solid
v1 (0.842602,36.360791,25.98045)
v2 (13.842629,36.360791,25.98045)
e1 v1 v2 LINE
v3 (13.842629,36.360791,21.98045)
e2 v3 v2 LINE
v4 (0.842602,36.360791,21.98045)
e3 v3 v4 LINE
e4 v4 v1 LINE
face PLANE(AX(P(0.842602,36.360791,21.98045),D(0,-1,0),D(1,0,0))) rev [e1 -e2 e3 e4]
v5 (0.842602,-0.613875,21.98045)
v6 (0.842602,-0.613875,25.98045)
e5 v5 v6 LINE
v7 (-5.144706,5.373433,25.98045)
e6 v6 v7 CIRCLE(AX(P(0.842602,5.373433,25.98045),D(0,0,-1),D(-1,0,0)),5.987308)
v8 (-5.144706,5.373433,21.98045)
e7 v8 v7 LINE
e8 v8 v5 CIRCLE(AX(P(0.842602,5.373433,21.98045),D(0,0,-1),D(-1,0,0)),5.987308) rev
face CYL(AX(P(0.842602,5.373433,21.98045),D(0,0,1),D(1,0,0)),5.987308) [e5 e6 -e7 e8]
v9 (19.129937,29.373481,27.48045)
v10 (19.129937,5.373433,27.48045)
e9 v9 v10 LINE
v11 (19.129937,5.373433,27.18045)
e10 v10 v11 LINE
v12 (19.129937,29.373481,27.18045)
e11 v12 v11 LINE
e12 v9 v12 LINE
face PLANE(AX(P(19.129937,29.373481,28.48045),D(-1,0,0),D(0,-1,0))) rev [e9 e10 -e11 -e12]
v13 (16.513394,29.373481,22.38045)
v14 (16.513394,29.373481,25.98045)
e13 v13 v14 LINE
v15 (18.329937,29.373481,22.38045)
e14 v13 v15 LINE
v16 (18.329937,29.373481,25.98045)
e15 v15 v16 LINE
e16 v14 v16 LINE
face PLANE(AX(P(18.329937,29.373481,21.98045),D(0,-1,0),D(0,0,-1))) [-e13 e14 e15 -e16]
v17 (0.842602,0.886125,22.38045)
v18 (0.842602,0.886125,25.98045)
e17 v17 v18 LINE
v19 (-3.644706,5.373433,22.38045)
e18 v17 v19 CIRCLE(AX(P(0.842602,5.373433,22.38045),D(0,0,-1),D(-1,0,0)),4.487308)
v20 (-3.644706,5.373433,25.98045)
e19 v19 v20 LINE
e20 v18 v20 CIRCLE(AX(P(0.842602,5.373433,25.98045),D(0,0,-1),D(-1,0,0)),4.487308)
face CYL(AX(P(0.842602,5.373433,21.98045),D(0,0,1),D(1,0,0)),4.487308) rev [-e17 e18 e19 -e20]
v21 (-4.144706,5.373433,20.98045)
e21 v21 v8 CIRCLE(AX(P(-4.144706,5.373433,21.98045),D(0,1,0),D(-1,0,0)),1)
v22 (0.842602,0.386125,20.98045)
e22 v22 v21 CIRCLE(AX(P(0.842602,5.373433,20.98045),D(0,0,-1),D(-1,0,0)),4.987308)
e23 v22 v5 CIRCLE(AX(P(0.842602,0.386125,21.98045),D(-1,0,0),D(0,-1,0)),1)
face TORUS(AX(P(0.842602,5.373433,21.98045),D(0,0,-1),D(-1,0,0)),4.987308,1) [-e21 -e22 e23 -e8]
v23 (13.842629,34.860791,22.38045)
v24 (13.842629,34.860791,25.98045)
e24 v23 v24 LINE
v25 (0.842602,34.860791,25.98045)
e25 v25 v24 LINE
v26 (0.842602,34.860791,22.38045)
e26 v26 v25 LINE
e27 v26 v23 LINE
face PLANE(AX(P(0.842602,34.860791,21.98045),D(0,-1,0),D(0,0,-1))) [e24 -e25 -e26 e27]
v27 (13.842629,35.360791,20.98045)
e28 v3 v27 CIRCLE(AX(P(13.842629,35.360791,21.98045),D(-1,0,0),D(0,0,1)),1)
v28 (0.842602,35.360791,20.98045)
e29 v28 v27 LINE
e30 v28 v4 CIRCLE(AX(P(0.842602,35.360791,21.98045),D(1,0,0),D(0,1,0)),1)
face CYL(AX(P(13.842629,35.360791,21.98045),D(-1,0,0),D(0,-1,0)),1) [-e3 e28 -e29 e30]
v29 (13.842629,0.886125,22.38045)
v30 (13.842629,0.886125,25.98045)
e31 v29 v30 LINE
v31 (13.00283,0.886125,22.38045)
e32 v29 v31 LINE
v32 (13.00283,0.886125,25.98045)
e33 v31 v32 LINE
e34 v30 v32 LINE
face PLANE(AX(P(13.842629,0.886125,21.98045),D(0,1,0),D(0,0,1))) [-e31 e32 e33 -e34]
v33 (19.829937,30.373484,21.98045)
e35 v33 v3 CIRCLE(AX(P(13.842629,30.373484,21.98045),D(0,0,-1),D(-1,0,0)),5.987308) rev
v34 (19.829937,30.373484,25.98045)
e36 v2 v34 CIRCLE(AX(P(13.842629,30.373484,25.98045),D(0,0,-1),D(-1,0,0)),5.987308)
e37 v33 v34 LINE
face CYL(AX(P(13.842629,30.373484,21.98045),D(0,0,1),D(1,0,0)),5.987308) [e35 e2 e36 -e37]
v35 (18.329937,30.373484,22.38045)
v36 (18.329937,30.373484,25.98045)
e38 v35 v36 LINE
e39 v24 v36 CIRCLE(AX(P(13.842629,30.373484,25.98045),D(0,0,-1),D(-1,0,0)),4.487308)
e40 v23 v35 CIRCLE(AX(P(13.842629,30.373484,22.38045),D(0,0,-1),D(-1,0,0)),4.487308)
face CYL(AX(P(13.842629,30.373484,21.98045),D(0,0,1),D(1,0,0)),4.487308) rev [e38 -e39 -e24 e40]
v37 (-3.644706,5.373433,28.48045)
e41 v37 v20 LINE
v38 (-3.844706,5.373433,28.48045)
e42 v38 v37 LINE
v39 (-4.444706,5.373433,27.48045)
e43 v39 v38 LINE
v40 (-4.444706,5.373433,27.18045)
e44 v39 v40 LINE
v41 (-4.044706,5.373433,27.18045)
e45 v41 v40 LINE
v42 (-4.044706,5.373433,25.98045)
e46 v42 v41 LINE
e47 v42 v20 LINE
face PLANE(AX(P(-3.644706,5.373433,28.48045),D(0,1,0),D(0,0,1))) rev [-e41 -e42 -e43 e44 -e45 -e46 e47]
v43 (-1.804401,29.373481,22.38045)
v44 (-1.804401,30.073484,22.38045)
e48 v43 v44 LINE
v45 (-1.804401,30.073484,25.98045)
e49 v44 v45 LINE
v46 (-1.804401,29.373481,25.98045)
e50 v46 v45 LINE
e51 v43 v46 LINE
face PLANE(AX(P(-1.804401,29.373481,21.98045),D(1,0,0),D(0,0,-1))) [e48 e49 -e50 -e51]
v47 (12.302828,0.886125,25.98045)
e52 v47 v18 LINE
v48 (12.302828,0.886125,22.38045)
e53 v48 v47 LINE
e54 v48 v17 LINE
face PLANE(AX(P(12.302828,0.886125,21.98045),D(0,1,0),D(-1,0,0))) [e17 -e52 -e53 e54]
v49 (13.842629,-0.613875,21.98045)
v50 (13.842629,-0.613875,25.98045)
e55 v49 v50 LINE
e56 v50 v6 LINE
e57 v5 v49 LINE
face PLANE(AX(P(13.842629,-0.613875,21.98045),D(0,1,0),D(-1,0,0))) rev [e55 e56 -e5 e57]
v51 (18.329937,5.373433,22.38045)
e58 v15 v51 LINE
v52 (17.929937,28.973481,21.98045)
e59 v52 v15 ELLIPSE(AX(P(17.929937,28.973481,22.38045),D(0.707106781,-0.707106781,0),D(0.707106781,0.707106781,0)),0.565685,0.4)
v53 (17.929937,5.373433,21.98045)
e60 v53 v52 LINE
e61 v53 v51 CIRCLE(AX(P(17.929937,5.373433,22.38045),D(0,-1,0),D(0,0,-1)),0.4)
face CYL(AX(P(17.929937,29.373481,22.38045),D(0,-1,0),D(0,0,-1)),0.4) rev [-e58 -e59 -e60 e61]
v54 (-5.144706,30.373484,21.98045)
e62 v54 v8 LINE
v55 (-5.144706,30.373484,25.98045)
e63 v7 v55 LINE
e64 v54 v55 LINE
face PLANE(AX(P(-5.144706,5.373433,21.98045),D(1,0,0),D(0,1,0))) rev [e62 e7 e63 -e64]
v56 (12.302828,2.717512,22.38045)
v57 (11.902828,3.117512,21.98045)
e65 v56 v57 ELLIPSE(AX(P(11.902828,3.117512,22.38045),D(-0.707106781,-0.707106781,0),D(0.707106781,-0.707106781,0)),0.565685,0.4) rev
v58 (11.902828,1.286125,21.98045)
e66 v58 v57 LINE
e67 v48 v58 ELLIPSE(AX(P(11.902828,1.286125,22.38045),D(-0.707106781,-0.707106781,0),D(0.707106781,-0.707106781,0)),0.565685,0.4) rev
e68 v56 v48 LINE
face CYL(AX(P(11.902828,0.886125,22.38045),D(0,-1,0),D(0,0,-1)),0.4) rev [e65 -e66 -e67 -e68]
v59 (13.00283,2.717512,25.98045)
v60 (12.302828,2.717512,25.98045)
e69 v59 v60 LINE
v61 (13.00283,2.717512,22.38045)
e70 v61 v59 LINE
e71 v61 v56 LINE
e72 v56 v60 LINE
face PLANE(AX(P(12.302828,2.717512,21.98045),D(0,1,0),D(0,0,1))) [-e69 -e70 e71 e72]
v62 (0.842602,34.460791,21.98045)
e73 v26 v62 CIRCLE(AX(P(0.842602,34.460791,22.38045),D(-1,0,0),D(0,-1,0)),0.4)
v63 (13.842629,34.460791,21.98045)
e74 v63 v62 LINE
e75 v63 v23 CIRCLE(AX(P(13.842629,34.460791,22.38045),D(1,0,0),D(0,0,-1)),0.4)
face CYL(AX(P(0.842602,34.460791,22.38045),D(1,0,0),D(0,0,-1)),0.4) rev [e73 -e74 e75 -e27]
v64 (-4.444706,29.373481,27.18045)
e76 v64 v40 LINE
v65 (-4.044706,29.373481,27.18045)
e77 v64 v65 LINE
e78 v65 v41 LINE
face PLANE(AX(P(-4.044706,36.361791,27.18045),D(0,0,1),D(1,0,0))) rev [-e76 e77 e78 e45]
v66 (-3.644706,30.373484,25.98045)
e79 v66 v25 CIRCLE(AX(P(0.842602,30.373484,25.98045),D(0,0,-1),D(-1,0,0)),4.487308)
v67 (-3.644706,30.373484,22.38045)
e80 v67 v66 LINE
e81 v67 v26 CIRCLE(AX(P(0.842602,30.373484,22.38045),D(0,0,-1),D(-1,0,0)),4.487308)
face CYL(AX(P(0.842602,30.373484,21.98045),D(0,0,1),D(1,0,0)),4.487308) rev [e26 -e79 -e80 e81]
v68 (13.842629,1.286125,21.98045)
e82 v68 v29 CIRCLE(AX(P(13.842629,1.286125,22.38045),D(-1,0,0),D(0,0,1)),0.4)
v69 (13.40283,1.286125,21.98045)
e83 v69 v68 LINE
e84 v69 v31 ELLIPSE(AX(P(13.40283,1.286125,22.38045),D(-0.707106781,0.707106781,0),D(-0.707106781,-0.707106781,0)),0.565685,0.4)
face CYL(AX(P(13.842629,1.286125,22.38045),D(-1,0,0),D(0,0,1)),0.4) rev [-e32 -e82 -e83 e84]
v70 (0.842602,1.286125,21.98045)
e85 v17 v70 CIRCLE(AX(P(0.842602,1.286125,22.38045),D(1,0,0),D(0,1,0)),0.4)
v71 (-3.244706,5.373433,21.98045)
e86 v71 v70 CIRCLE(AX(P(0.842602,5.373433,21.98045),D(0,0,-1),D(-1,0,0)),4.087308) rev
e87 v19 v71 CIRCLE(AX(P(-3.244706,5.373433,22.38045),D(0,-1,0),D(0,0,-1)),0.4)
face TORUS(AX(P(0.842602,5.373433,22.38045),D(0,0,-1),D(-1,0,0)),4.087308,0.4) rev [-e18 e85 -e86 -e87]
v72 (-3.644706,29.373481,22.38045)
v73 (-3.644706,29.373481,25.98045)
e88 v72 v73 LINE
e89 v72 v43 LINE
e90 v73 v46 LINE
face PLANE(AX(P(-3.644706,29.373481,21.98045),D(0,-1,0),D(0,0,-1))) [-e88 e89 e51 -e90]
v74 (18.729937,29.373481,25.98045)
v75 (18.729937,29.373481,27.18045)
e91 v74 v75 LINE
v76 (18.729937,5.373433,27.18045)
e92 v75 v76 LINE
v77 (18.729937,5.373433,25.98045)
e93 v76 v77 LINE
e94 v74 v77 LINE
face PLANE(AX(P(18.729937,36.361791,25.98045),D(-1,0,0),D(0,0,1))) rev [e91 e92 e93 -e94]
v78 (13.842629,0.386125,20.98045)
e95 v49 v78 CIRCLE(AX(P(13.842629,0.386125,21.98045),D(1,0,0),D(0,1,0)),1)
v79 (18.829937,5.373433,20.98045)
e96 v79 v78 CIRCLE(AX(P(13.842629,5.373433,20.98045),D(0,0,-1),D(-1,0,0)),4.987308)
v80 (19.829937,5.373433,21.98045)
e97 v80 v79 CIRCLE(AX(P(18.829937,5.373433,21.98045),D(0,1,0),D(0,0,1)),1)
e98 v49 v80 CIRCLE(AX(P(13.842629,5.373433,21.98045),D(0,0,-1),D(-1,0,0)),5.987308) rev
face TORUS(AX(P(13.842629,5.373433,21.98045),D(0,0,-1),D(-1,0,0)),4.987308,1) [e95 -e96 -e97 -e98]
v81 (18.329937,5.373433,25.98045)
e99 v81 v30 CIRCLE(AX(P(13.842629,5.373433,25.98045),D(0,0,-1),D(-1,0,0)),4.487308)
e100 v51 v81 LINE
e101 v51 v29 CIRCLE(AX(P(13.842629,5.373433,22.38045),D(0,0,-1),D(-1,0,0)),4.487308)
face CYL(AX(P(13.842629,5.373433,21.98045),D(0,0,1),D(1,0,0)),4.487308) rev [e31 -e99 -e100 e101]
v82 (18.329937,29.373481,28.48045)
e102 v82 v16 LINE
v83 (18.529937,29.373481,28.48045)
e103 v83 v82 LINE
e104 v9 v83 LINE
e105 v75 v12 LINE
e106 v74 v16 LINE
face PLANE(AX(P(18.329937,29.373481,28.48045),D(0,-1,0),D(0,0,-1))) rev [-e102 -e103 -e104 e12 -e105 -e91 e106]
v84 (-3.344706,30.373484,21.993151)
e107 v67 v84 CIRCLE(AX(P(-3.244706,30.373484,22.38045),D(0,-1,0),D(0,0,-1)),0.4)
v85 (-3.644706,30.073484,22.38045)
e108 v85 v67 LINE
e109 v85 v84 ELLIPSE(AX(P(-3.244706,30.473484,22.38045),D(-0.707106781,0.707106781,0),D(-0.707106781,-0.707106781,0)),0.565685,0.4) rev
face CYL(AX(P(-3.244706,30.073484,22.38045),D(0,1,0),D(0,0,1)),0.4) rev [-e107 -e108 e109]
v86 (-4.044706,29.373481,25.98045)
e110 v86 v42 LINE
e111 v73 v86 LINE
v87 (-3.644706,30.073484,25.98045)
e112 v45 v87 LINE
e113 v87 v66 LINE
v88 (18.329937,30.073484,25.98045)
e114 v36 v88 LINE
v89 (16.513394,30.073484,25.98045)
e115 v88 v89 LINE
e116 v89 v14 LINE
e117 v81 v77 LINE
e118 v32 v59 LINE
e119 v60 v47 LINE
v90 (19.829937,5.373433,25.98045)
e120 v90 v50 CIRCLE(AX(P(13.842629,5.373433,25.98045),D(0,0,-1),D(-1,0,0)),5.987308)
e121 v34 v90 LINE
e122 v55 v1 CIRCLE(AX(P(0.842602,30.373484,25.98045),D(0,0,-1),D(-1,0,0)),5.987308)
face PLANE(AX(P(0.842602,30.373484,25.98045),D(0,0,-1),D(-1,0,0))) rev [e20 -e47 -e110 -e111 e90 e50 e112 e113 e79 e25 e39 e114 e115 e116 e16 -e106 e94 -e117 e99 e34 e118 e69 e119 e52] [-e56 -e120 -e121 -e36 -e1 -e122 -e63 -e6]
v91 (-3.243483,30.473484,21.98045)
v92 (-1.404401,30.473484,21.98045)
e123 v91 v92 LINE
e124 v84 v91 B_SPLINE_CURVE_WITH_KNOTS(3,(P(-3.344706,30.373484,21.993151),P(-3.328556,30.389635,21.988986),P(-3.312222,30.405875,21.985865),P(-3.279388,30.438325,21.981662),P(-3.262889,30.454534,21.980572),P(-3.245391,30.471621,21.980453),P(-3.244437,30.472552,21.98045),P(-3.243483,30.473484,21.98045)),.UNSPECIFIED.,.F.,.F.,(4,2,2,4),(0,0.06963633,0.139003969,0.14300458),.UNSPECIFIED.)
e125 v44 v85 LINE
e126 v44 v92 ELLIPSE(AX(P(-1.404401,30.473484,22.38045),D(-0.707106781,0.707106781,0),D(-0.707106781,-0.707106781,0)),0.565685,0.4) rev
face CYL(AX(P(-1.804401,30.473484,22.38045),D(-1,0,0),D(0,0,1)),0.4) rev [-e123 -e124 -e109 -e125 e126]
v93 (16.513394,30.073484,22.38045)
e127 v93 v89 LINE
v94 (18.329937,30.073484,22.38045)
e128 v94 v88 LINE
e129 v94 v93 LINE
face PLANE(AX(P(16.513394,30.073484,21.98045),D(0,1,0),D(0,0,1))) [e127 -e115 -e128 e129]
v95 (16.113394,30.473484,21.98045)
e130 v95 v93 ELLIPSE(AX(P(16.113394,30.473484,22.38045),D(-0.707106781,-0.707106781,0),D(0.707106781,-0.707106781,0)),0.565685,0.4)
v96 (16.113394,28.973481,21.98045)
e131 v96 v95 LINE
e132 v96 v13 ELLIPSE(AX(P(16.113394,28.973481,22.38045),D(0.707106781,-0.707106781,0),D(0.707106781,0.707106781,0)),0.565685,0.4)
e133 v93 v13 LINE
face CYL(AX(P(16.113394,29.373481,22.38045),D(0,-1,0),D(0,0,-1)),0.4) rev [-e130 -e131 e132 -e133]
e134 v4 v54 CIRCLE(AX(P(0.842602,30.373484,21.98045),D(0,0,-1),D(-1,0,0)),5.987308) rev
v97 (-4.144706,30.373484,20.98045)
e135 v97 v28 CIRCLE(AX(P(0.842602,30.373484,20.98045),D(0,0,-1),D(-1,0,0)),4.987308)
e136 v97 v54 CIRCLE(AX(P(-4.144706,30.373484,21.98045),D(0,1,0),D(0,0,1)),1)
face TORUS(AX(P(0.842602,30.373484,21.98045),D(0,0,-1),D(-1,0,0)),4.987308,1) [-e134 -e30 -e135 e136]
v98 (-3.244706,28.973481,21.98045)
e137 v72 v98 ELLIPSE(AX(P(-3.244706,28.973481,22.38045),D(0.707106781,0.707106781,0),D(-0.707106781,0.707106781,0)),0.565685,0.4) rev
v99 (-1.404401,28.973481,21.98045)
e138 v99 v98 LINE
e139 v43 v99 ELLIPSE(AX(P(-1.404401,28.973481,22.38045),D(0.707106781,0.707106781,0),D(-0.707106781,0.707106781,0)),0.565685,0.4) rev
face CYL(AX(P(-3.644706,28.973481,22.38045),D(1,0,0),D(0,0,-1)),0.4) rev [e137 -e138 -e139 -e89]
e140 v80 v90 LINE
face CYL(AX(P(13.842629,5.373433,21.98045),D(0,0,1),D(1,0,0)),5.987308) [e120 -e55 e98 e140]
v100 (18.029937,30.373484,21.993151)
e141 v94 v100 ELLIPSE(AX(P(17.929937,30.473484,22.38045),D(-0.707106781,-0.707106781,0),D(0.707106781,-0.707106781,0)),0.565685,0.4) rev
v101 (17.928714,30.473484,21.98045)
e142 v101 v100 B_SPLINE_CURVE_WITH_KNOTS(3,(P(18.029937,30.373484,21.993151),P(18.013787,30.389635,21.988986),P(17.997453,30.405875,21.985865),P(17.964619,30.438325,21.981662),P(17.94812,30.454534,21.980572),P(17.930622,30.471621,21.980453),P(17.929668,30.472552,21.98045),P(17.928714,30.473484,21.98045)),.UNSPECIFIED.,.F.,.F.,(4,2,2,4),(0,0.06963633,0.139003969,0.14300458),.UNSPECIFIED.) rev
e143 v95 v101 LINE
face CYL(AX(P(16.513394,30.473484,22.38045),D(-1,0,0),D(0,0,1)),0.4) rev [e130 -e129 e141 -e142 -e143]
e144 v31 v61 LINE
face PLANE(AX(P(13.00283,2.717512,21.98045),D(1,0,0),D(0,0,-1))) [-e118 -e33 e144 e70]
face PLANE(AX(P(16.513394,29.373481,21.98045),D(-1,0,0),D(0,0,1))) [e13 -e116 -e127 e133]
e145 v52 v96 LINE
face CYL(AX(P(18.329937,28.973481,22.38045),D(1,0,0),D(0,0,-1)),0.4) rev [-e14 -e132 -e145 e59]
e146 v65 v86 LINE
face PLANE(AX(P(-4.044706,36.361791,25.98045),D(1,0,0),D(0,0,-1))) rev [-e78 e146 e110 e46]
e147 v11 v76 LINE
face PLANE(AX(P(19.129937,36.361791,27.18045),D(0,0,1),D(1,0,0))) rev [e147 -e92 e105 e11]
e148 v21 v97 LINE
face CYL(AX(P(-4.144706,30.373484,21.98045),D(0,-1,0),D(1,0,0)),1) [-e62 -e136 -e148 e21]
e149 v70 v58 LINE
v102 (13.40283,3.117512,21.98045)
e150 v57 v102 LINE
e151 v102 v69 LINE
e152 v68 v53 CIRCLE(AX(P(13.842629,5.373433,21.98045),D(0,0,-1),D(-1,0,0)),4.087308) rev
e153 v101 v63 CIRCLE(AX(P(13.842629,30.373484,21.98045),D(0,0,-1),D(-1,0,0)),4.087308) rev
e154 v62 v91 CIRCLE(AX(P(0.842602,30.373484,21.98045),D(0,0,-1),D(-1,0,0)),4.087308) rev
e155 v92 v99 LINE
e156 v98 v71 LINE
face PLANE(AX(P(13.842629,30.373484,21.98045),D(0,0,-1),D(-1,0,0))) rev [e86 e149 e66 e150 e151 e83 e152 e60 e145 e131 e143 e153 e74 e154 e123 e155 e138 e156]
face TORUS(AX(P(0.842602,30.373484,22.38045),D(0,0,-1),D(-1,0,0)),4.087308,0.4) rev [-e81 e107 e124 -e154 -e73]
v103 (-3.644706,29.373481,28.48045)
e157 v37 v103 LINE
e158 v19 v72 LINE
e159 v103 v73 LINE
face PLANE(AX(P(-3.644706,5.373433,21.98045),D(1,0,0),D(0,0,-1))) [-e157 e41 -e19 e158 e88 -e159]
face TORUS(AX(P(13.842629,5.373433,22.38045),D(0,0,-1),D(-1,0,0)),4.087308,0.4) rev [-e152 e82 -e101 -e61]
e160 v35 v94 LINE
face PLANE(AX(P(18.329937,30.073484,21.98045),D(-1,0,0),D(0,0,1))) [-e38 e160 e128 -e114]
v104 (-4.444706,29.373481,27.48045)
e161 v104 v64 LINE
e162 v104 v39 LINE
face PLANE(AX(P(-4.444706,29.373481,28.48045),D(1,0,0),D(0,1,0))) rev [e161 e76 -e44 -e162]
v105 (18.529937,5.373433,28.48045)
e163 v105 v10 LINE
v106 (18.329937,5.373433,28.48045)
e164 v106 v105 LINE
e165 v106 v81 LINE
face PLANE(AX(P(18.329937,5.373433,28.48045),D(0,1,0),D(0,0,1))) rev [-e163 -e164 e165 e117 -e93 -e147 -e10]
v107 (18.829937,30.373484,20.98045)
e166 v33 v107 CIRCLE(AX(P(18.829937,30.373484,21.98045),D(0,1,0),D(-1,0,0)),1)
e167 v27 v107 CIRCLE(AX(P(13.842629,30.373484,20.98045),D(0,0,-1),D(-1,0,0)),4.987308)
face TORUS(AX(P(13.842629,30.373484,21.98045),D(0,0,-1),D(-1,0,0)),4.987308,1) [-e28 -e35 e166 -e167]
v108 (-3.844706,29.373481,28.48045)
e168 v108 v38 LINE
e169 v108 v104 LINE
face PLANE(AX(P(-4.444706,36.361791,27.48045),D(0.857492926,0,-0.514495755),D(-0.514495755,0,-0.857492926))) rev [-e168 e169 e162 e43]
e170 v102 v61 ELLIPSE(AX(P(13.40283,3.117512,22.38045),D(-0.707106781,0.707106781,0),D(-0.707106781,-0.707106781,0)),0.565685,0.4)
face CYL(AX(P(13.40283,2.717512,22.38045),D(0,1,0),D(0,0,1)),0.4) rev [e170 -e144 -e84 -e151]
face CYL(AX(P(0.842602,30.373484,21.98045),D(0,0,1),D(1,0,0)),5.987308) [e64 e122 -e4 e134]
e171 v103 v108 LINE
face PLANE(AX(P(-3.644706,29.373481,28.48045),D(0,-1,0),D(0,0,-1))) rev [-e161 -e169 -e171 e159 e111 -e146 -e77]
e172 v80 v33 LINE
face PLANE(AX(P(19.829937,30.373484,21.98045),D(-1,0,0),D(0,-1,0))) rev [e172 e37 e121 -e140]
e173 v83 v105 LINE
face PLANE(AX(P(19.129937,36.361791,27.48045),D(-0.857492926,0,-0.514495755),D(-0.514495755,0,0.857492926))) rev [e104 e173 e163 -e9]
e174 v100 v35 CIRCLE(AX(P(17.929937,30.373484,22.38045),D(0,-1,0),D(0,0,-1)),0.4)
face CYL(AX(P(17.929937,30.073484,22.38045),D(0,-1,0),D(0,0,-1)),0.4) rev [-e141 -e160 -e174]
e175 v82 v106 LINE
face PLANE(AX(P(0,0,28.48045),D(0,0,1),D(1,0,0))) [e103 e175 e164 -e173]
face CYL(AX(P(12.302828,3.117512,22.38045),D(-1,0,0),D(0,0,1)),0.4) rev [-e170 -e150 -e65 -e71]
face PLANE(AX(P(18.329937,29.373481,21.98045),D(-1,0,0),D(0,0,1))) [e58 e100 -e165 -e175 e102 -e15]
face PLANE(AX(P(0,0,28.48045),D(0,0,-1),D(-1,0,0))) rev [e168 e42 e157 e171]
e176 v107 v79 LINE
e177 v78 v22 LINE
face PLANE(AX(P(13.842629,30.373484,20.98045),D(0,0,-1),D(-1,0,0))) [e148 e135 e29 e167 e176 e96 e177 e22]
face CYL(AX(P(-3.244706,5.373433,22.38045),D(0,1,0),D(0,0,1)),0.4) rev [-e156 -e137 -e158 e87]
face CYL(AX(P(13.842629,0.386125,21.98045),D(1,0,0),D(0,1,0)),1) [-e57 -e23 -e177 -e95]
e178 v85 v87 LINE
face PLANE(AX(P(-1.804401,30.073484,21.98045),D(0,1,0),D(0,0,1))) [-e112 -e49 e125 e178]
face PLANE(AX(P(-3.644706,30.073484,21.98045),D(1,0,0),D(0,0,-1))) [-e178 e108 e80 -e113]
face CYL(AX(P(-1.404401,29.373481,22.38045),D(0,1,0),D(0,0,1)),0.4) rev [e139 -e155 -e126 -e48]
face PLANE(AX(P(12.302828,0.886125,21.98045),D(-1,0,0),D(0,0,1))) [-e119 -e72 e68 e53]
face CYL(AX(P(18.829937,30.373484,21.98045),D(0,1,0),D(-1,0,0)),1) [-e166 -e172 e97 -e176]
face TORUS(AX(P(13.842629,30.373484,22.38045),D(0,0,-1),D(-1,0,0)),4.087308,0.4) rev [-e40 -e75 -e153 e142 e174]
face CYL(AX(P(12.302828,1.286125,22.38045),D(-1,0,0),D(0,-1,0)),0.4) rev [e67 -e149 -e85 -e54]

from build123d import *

# Parameters (mm, degrees)
BOSS_EXTRUDE1_DEPTH = 4
BOSS_EXTRUDE2_DEPTH = 1
SKETCH3_W           = 0.8
SKETCH3_H           = 24.00004826
BOSS_EXTRUDE3_DEPTH = 2.5
CUT_EXTRUDE1_REACH  = 48.525
SKETCH4_W           = 0.4
SKETCH4_H           = 1.2
FILLET1_R           = 1
FILLET2_R           = 0.4


with BuildPart() as part:
    # Sketch1 → Boss-Extrude1 (new body)
    with BuildSketch(Plane(origin=(0, 0, 25.980449513), x_dir=(-1, 0, 0), z_dir=(0, 0, -1))):
        with BuildLine():
            Line((-0.842601542, 36.360791374), (-13.842629482, 36.360791374))
            ThreePointArc((-13.842629482, 36.360791374), (-18.076295283, 34.607149581), (-19.829937076, 30.37348378))
            Line((-19.829937076, 30.37348378), (-19.829937076, 5.373432979))
            ThreePointArc((-19.829937076, 5.373432979), (-18.076295283, 1.139767178), (-13.842629482, -0.613874615))
            Line((-13.842629482, -0.613874615), (-0.842601542, -0.613874615))
            ThreePointArc((-0.842601542, -0.613874615), (3.391064259, 1.139767178), (5.144706053, 5.373432979))
            Line((5.144706053, 5.373432979), (5.144706053, 30.37348378))
            ThreePointArc((5.144706053, 30.37348378), (3.391064259, 34.607149581), (-0.842601542, 36.360791374))
        make_face()
        with BuildLine():
            Line((-18.329937076, 29.373481239), (-16.513394023, 29.373481239))
            Line((-16.513394023, 29.373481239), (-16.513394023, 30.07348378))
            Line((-16.513394023, 30.07348378), (-18.329937076, 30.07348378))
            Line((-18.329937076, 30.07348378), (-18.329937076, 30.37348378))
            ThreePointArc((-18.329937076, 30.37348378), (-17.015635111, 33.546489409), (-13.842629482, 34.860791374))
            Line((-13.842629482, 34.860791374), (-0.842601542, 34.860791374))
            ThreePointArc((-0.842601542, 34.860791374), (2.330404088, 33.546489409), (3.644706053, 30.37348378))
            Line((3.644706053, 30.37348378), (3.644706053, 30.07348378))
            Line((3.644706053, 30.07348378), (1.804401252, 30.07348378))
            Line((1.804401252, 30.07348378), (1.804401252, 29.373481239))
            Line((1.804401252, 29.373481239), (3.644706053, 29.373481239))
            Line((3.644706053, 29.373481239), (3.644706053, 5.373432979))
            ThreePointArc((3.644706053, 5.373432979), (2.330404088, 2.20042735), (-0.842601542, 0.886125385))
            Line((-0.842601542, 0.886125385), (-12.302827602, 0.886125385))
            Line((-12.302827602, 0.886125385), (-12.302827602, 2.717512228))
            Line((-12.302827602, 2.717512228), (-13.002830142, 2.717512228))
            Line((-13.002830142, 2.717512228), (-13.002830142, 0.886125385))
            Line((-13.002830142, 0.886125385), (-13.842629482, 0.886125385))
            ThreePointArc((-13.842629482, 0.886125385), (-17.015635111, 2.20042735), (-18.329937076, 5.373432979))
            Line((-18.329937076, 5.373432979), (-18.329937076, 29.373481239))
        make_face(mode=Mode.SUBTRACT)
    extrude(amount=BOSS_EXTRUDE1_DEPTH)

    # Sketch2 → Boss-Extrude2 (add)
    with BuildSketch(Plane(origin=(0, 0, 21.980449513), x_dir=(-1, 0, 0), z_dir=(0, 0, -1))):
        with BuildLine():
            Line((-19.829937076, 30.37348378), (-19.829937076, 5.373432979))
            ThreePointArc((-19.829937076, 5.373432979), (-18.076295283, 1.139767178), (-13.842629482, -0.613874615))
            Line((-13.842629482, -0.613874615), (-0.842601542, -0.613874615))
            ThreePointArc((-0.842601542, -0.613874615), (3.391064259, 1.139767178), (5.144706053, 5.373432979))
            Line((5.144706053, 5.373432979), (5.144706053, 30.37348378))
            ThreePointArc((5.144706053, 30.37348378), (3.391064259, 34.607149581), (-0.842601542, 36.360791374))
            Line((-0.842601542, 36.360791374), (-13.842629482, 36.360791374))
            ThreePointArc((-13.842629482, 36.360791374), (-18.076295283, 34.607149581), (-19.829937076, 30.37348378))
        make_face()
    extrude(amount=BOSS_EXTRUDE2_DEPTH)

    # Sketch3 → Boss-Extrude3 (add)
    with BuildSketch(Plane.XY.offset(25.980449513)):
        with Locations((-4.044706053, 17.373457109)):
            Rectangle(SKETCH3_W, SKETCH3_H)
        with Locations((18.729937076, 17.373457109)):
            Rectangle(SKETCH3_W, SKETCH3_H)
    extrude(amount=BOSS_EXTRUDE3_DEPTH)

    # Sketch4 → Cut-Extrude1 (cut, up to next)
    with BuildSketch(Plane.XZ.offset(-5.373432979), mode=Mode.PRIVATE) as cut_extrude1_sk1:
        with Locations((-4.244706053, 26.580449513)):
            Rectangle(SKETCH4_W, SKETCH4_H)
    cut_extrude1_tool1 = extrude(cut_extrude1_sk1.sketch, amount=-CUT_EXTRUDE1_REACH, mode=Mode.PRIVATE) & part.part
    # Sketch4 → Cut-Extrude1 (cut, up to next)
    with BuildSketch(Plane.XZ.offset(-5.373432979), mode=Mode.PRIVATE) as cut_extrude1_sk2:
        Polygon((-4.444706053, 28.480449513), (-4.444706053, 27.480449513), (-3.844706053, 28.480449513), align=None)
    cut_extrude1_tool2 = extrude(cut_extrude1_sk2.sketch, amount=-CUT_EXTRUDE1_REACH, mode=Mode.PRIVATE) & part.part
    # Sketch4 → Cut-Extrude1 (cut, up to next)
    with BuildSketch(Plane.XZ.offset(-5.373432979), mode=Mode.PRIVATE) as cut_extrude1_sk3:
        with Locations((18.929937076, 26.580449513)):
            Rectangle(SKETCH4_W, SKETCH4_H)
    cut_extrude1_tool3 = extrude(cut_extrude1_sk3.sketch, amount=-CUT_EXTRUDE1_REACH, mode=Mode.PRIVATE) & part.part
    # Sketch4 → Cut-Extrude1 (cut, up to next)
    with BuildSketch(Plane.XZ.offset(-5.373432979), mode=Mode.PRIVATE) as cut_extrude1_sk4:
        Polygon((18.529937076, 28.480449513), (19.129937076, 28.480449513), (19.129937076, 27.480449513), align=None)
    cut_extrude1_tool4 = extrude(cut_extrude1_sk4.sketch, amount=-CUT_EXTRUDE1_REACH, mode=Mode.PRIVATE) & part.part
    add(cut_extrude1_tool1.solids().sort_by_distance((-4.244706, 5.373433, 26.58045))[0], mode=Mode.SUBTRACT)
    add(cut_extrude1_tool2.solids().sort_by_distance((-4.244706, 5.373433, 28.147116))[0], mode=Mode.SUBTRACT)
    add(cut_extrude1_tool3.solids().sort_by_distance((18.929937, 5.373433, 26.58045))[0], mode=Mode.SUBTRACT)
    add(cut_extrude1_tool4.solids().sort_by_distance((18.929937, 5.373433, 28.147116))[0], mode=Mode.SUBTRACT)

    # Fillet1
    fillet1_edges = [part.edges().sort_by_distance(p)[0] for p in [
        (18.076295283, 34.607149581, 20.980449513),
        (19.829937076, 17.873458379, 20.980449513),
        (18.076295283, 1.139767178, 20.980449513),
        (7.342615512, -0.613874615, 20.980449513),
        (-3.391064259, 1.139767178, 20.980449513),
        (-5.144706053, 17.873458379, 20.980449513),
        (-3.391064259, 34.607149581, 20.980449513),
        (7.342615512, 36.360791374, 20.980449513),
    ]]
    fillet(fillet1_edges, radius=FILLET1_R)

    # Fillet2
    # the kernel refuses this fillet: 0.4 mm, written as the material it adds along each edge
    with BuildSketch(Plane(origin=(13.842629482, 34.860791374, 21.980449513), x_dir=(0, 0, 1), z_dir=(-1, 0, 0))) as fillet2_piece_1:
        with BuildLine():
            CenterArc((FILLET2_R, -FILLET2_R), FILLET2_R, 90, 90)
            Line((0, -FILLET2_R), (0, 0))
            Line((0, 0), (FILLET2_R, 0))
        make_face()
    extrude(amount=13.00002794)
    with BuildSketch(Plane(origin=(13.842629482, 30.37348378, 21.980449513), x_dir=(1, 0, 0), z_dir=(0, -1, 0))) as fillet2_piece_2:
        with BuildLine():
            CenterArc((4.487307595 - FILLET2_R, FILLET2_R), FILLET2_R, 270, 90)
            Line((4.487307595 - FILLET2_R, 0), (4.487307595, 0))
            Line((4.487307595, 0), (4.487307595, FILLET2_R))
        make_face()
    revolve(axis=Axis((13.842629482, 30.37348378, 21.980449513), (0, 0, 1)), revolution_arc=90)
    with BuildSketch(Plane(origin=(16.513394023, 30.07348378, 21.980449513), x_dir=(0, 0, 1), z_dir=(1, 0, 0)), Plane(origin=(19.329937076, 29.373481239, 21.980449513), x_dir=(0, 0, 1), z_dir=(-1, 0, 0))) as fillet2_piece_3:
        with BuildLine():
            CenterArc((FILLET2_R, -FILLET2_R), FILLET2_R, 90, 90)
            Line((0, -FILLET2_R), (0, 0))
            Line((0, 0), (FILLET2_R, 0))
        make_face()
    extrude(amount=2.816543053)
    with BuildSketch(Plane(origin=(16.513394023, 29.373481239, 21.980449513), x_dir=(0, 0, 1), z_dir=(0, 1, 0)), Plane(origin=(12.302827602, 2.717512228, 21.980449513), x_dir=(0, 0, 1), z_dir=(1, 0, 0)), Plane(origin=(-1.804401252, 30.07348378, 21.980449513), x_dir=(0, 0, 1), z_dir=(0, -1, 0))) as fillet2_piece_4:
        with BuildLine():
            CenterArc((FILLET2_R, -FILLET2_R), FILLET2_R, 90, 90)
            Line((0, -FILLET2_R), (0, 0))
            Line((0, 0), (FILLET2_R, 0))
        make_face()
    extrude(amount=0.70000254)
    with BuildSketch(Plane(origin=(18.329937076, 5.373432979, 21.980449513), x_dir=(-1, 0, 0), z_dir=(0, 1, 0)), Plane(origin=(-3.644706053, 30.373481239, 21.980449513), x_dir=(1, 0, 0), z_dir=(0, -1, 0))) as fillet2_piece_5:
        with BuildLine():
            CenterArc((FILLET2_R, FILLET2_R), FILLET2_R, 180, 90)
            Line((0, FILLET2_R), (0, 0))
            Line((0, 0), (FILLET2_R, 0))
        make_face()
    extrude(amount=25.00004826)
    with BuildSketch(Plane(origin=(13.842629482, 5.373432979, 21.980449513), x_dir=(0, -1, 0), z_dir=(-1, 0, 0))) as fillet2_piece_6:
        with BuildLine():
            CenterArc((4.487307595 - FILLET2_R, FILLET2_R), FILLET2_R, 270, 90)
            Line((4.487307595 - FILLET2_R, 0), (4.487307595, 0))
            Line((4.487307595, 0), (4.487307595, FILLET2_R))
        make_face()
    revolve(axis=Axis((13.842629482, 5.373432979, 21.980449513), (0, 0, 1)), revolution_arc=90)
    with BuildSketch(Plane(origin=(12.002830142, 0.886125385, 21.980449513), x_dir=(0, 0, 1), z_dir=(1, 0, 0))) as fillet2_piece_7:
        with BuildLine():
            CenterArc((FILLET2_R, -FILLET2_R), FILLET2_R, 90, 90)
            Line((0, -FILLET2_R), (0, 0))
            Line((0, 0), (FILLET2_R, 0))
        make_face()
    extrude(amount=1.83979934)
    with BuildSketch(Plane(origin=(13.002830142, 2.717512228, 21.980449513), x_dir=(0, 0, 1), z_dir=(0, -1, 0)), Plane(origin=(12.302827602, -0.113874615, 21.980449513), x_dir=(0, 0, 1), z_dir=(0, 1, 0))) as fillet2_piece_8:
        with BuildLine():
            CenterArc((FILLET2_R, -FILLET2_R), FILLET2_R, 90, 90)
            Line((0, -FILLET2_R), (0, 0))
            Line((0, 0), (FILLET2_R, 0))
        make_face()
    extrude(amount=2.831386843)
    with BuildSketch(Plane(origin=(0.842601542, 0.886125385, 21.980449513), x_dir=(0, 0, 1), z_dir=(1, 0, 0))) as fillet2_piece_9:
        with BuildLine():
            CenterArc((FILLET2_R, -FILLET2_R), FILLET2_R, 90, 90)
            Line((0, -FILLET2_R), (0, 0))
            Line((0, 0), (FILLET2_R, 0))
        make_face()
    extrude(amount=12.46022606)
    with BuildSketch(Plane(origin=(0.842601542, 5.373432979, 21.980449513), x_dir=(-1, 0, 0), z_dir=(0, 1, 0))) as fillet2_piece_10:
        with BuildLine():
            CenterArc((4.487307595 - FILLET2_R, FILLET2_R), FILLET2_R, 270, 90)
            Line((4.487307595 - FILLET2_R, 0), (4.487307595, 0))
            Line((4.487307595, 0), (4.487307595, FILLET2_R))
        make_face()
    revolve(axis=Axis((0.842601542, 5.373432979, 21.980449513), (0, 0, 1)), revolution_arc=90)
    with BuildSketch(Plane(origin=(-1.804401252, 29.373481239, 21.980449513), x_dir=(0, 0, 1), z_dir=(-1, 0, 0)), Plane(origin=(-4.644706053, 30.07348378, 21.980449513), x_dir=(0, 0, 1), z_dir=(1, 0, 0))) as fillet2_piece_11:
        with BuildLine():
            CenterArc((FILLET2_R, -FILLET2_R), FILLET2_R, 90, 90)
            Line((0, -FILLET2_R), (0, 0))
            Line((0, 0), (FILLET2_R, 0))
        make_face()
    extrude(amount=2.840304801)
    with BuildSketch(Plane(origin=(0.842601542, 30.37348378, 21.980449513), x_dir=(0, 1, 0), z_dir=(1, 0, 0))) as fillet2_piece_12:
        with BuildLine():
            CenterArc((4.487307595 - FILLET2_R, FILLET2_R), FILLET2_R, 270, 90)
            Line((4.487307595 - FILLET2_R, 0), (4.487307595, 0))
            Line((4.487307595, 0), (4.487307595, FILLET2_R))
        make_face()
    revolve(axis=Axis((0.842601542, 30.37348378, 21.980449513), (0, 0, 1)), revolution_arc=90)
    with BuildSketch(Plane(origin=(-3.644706053, 30.37348378, 21.980449513), x_dir=(0, 0, 1), z_dir=(0, -1, 0)), Plane(origin=(18.329937076, 29.07348378, 21.980449513), x_dir=(0, 0, 1), z_dir=(0, 1, 0))) as fillet2_piece_13:
        with BuildLine():
            CenterArc((FILLET2_R, -FILLET2_R), FILLET2_R, 90, 90)
            Line((0, -FILLET2_R), (0, 0))
            Line((0, 0), (FILLET2_R, 0))
        make_face()
    extrude(amount=1.3)
    with BuildSketch(Plane(origin=(16.513394023, 29.373481239, 21.980449513), x_dir=(0, 0, 1), z_dir=(0, 1, 0))) as fillet2_piece_14a_section:
        with BuildLine():
            CenterArc((FILLET2_R, -FILLET2_R), FILLET2_R, 90, 90)
            Line((0, -FILLET2_R), (0, 0))
            Line((0, 0), (FILLET2_R, 0))
        make_face()
    fillet2_piece_14a = extrude(amount=1.70000254, mode=Mode.PRIVATE)
    fillet2_piece_14a = split(fillet2_piece_14a, bisect_by=Plane(origin=(16.422835978, 30.07348378, 22.071007558), z_dir=(0, 1, 0)), keep=Keep.TOP, mode=Mode.PRIVATE)
    with BuildSketch(Plane(origin=(15.513394023, 30.07348378, 21.980449513), x_dir=(0, 0, 1), z_dir=(1, 0, 0))) as fillet2_piece_14b_section:
        with BuildLine():
            CenterArc((FILLET2_R, -FILLET2_R), FILLET2_R, 90, 90)
            Line((0, -FILLET2_R), (0, 0))
            Line((0, 0), (FILLET2_R, 0))
        make_face()
    fillet2_piece_14b = extrude(amount=2.816543053, mode=Mode.PRIVATE)
    fillet2_piece_14b = split(fillet2_piece_14b, bisect_by=Plane(origin=(16.513394023, 30.164041825, 22.071007558), z_dir=(-1, 0, 0)), keep=Keep.TOP, mode=Mode.PRIVATE)
    fillet2_piece_14 = fillet2_piece_14a & fillet2_piece_14b
    add(fillet2_piece_14)
    with BuildSketch(Plane(origin=(18.329937076, 29.373481239, 21.980449513), x_dir=(0, 0, 1), z_dir=(-1, 0, 0))) as fillet2_piece_15a_section:
        with BuildLine():
            CenterArc((FILLET2_R, -FILLET2_R), FILLET2_R, 90, 90)
            Line((0, -FILLET2_R), (0, 0))
            Line((0, 0), (FILLET2_R, 0))
        make_face()
    fillet2_piece_15a = extrude(amount=2.816543053, mode=Mode.PRIVATE)
    fillet2_piece_15a = split(fillet2_piece_15a, bisect_by=Plane(origin=(16.513394023, 29.282923194, 22.071007558), z_dir=(-1, 0, 0)), keep=Keep.TOP, mode=Mode.PRIVATE)
    with BuildSketch(Plane(origin=(16.513394023, 28.373481239, 21.980449513), x_dir=(0, 0, 1), z_dir=(0, 1, 0))) as fillet2_piece_15b_section:
        with BuildLine():
            CenterArc((FILLET2_R, -FILLET2_R), FILLET2_R, 90, 90)
            Line((0, -FILLET2_R), (0, 0))
            Line((0, 0), (FILLET2_R, 0))
        make_face()
    fillet2_piece_15b = extrude(amount=1.70000254, mode=Mode.PRIVATE)
    fillet2_piece_15b = split(fillet2_piece_15b, bisect_by=Plane(origin=(16.422835978, 29.373481239, 22.071007558), z_dir=(0, -1, 0)), keep=Keep.TOP, mode=Mode.PRIVATE)
    fillet2_piece_15 = fillet2_piece_15a & fillet2_piece_15b
    add(fillet2_piece_15)
    with BuildSketch(Plane(origin=(12.302827602, 2.717512228, 21.980449513), x_dir=(0, 0, 1), z_dir=(1, 0, 0))) as fillet2_piece_16a_section:
        with BuildLine():
            CenterArc((FILLET2_R, -FILLET2_R), FILLET2_R, 90, 90)
            Line((0, -FILLET2_R), (0, 0))
            Line((0, 0), (FILLET2_R, 0))
        make_face()
    fillet2_piece_16a = extrude(amount=1.70000254, mode=Mode.PRIVATE)
    fillet2_piece_16a = split(fillet2_piece_16a, bisect_by=Plane(origin=(13.002830142, 2.808070273, 22.071007558), z_dir=(1, 0, 0)), keep=Keep.TOP, mode=Mode.PRIVATE)
    with BuildSketch(Plane(origin=(13.002830142, 3.717512228, 21.980449513), x_dir=(0, 0, 1), z_dir=(0, -1, 0))) as fillet2_piece_16b_section:
        with BuildLine():
            CenterArc((FILLET2_R, -FILLET2_R), FILLET2_R, 90, 90)
            Line((0, -FILLET2_R), (0, 0))
            Line((0, 0), (FILLET2_R, 0))
        make_face()
    fillet2_piece_16b = extrude(amount=2.831386843, mode=Mode.PRIVATE)
    fillet2_piece_16b = split(fillet2_piece_16b, bisect_by=Plane(origin=(13.093388188, 2.717512228, 22.071007558), z_dir=(0, 1, 0)), keep=Keep.TOP, mode=Mode.PRIVATE)
    fillet2_piece_16 = fillet2_piece_16a & fillet2_piece_16b
    add(fillet2_piece_16)
    with BuildSketch(Plane(origin=(12.302827602, 0.886125385, 21.980449513), x_dir=(0, 0, 1), z_dir=(0, 1, 0))) as fillet2_piece_17a_section:
        with BuildLine():
            CenterArc((FILLET2_R, -FILLET2_R), FILLET2_R, 90, 90)
            Line((0, -FILLET2_R), (0, 0))
            Line((0, 0), (FILLET2_R, 0))
        make_face()
    fillet2_piece_17a = extrude(amount=2.831386843, mode=Mode.PRIVATE)
    fillet2_piece_17a = split(fillet2_piece_17a, bisect_by=Plane(origin=(12.212269557, 2.717512228, 22.071007558), z_dir=(0, 1, 0)), keep=Keep.TOP, mode=Mode.PRIVATE)
    with BuildSketch(Plane(origin=(11.302827602, 2.717512228, 21.980449513), x_dir=(0, 0, 1), z_dir=(1, 0, 0))) as fillet2_piece_17b_section:
        with BuildLine():
            CenterArc((FILLET2_R, -FILLET2_R), FILLET2_R, 90, 90)
            Line((0, -FILLET2_R), (0, 0))
            Line((0, 0), (FILLET2_R, 0))
        make_face()
    fillet2_piece_17b = extrude(amount=1.70000254, mode=Mode.PRIVATE)
    fillet2_piece_17b = split(fillet2_piece_17b, bisect_by=Plane(origin=(12.302827602, 2.808070273, 22.071007558), z_dir=(-1, 0, 0)), keep=Keep.TOP, mode=Mode.PRIVATE)
    fillet2_piece_17 = fillet2_piece_17a & fillet2_piece_17b
    add(fillet2_piece_17)
    with BuildSketch(Plane(origin=(-1.804401252, 30.07348378, 21.980449513), x_dir=(0, 0, 1), z_dir=(0, -1, 0))) as fillet2_piece_18a_section:
        with BuildLine():
            CenterArc((FILLET2_R, -FILLET2_R), FILLET2_R, 90, 90)
            Line((0, -FILLET2_R), (0, 0))
            Line((0, 0), (FILLET2_R, 0))
        make_face()
    fillet2_piece_18a = extrude(amount=1.70000254, mode=Mode.PRIVATE)
    fillet2_piece_18a = split(fillet2_piece_18a, bisect_by=Plane(origin=(-1.713843206, 29.373481239, 22.071007558), z_dir=(0, -1, 0)), keep=Keep.TOP, mode=Mode.PRIVATE)
    with BuildSketch(Plane(origin=(-0.804401252, 29.373481239, 21.980449513), x_dir=(0, 0, 1), z_dir=(-1, 0, 0))) as fillet2_piece_18b_section:
        with BuildLine():
            CenterArc((FILLET2_R, -FILLET2_R), FILLET2_R, 90, 90)
            Line((0, -FILLET2_R), (0, 0))
            Line((0, 0), (FILLET2_R, 0))
        make_face()
    fillet2_piece_18b = extrude(amount=2.840304801, mode=Mode.PRIVATE)
    fillet2_piece_18b = split(fillet2_piece_18b, bisect_by=Plane(origin=(-1.804401252, 29.282923194, 22.071007558), z_dir=(1, 0, 0)), keep=Keep.TOP, mode=Mode.PRIVATE)
    fillet2_piece_18 = fillet2_piece_18a & fillet2_piece_18b
    add(fillet2_piece_18)
    with BuildSketch(Plane(origin=(-3.644706053, 30.07348378, 21.980449513), x_dir=(0, 0, 1), z_dir=(1, 0, 0))) as fillet2_piece_19a_section:
        with BuildLine():
            CenterArc((FILLET2_R, -FILLET2_R), FILLET2_R, 90, 90)
            Line((0, -FILLET2_R), (0, 0))
            Line((0, 0), (FILLET2_R, 0))
        make_face()
    fillet2_piece_19a = extrude(amount=2.840304801, mode=Mode.PRIVATE)
    fillet2_piece_19a = split(fillet2_piece_19a, bisect_by=Plane(origin=(-1.804401252, 30.164041825, 22.071007558), z_dir=(1, 0, 0)), keep=Keep.TOP, mode=Mode.PRIVATE)
    with BuildSketch(Plane(origin=(-1.804401252, 31.07348378, 21.980449513), x_dir=(0, 0, 1), z_dir=(0, -1, 0))) as fillet2_piece_19b_section:
        with BuildLine():
            CenterArc((FILLET2_R, -FILLET2_R), FILLET2_R, 90, 90)
            Line((0, -FILLET2_R), (0, 0))
            Line((0, 0), (FILLET2_R, 0))
        make_face()
    fillet2_piece_19b = extrude(amount=1.70000254, mode=Mode.PRIVATE)
    fillet2_piece_19b = split(fillet2_piece_19b, bisect_by=Plane(origin=(-1.713843206, 30.07348378, 22.071007558), z_dir=(0, 1, 0)), keep=Keep.TOP, mode=Mode.PRIVATE)
    fillet2_piece_19 = fillet2_piece_19a & fillet2_piece_19b
    add(fillet2_piece_19)


solid = part.part
